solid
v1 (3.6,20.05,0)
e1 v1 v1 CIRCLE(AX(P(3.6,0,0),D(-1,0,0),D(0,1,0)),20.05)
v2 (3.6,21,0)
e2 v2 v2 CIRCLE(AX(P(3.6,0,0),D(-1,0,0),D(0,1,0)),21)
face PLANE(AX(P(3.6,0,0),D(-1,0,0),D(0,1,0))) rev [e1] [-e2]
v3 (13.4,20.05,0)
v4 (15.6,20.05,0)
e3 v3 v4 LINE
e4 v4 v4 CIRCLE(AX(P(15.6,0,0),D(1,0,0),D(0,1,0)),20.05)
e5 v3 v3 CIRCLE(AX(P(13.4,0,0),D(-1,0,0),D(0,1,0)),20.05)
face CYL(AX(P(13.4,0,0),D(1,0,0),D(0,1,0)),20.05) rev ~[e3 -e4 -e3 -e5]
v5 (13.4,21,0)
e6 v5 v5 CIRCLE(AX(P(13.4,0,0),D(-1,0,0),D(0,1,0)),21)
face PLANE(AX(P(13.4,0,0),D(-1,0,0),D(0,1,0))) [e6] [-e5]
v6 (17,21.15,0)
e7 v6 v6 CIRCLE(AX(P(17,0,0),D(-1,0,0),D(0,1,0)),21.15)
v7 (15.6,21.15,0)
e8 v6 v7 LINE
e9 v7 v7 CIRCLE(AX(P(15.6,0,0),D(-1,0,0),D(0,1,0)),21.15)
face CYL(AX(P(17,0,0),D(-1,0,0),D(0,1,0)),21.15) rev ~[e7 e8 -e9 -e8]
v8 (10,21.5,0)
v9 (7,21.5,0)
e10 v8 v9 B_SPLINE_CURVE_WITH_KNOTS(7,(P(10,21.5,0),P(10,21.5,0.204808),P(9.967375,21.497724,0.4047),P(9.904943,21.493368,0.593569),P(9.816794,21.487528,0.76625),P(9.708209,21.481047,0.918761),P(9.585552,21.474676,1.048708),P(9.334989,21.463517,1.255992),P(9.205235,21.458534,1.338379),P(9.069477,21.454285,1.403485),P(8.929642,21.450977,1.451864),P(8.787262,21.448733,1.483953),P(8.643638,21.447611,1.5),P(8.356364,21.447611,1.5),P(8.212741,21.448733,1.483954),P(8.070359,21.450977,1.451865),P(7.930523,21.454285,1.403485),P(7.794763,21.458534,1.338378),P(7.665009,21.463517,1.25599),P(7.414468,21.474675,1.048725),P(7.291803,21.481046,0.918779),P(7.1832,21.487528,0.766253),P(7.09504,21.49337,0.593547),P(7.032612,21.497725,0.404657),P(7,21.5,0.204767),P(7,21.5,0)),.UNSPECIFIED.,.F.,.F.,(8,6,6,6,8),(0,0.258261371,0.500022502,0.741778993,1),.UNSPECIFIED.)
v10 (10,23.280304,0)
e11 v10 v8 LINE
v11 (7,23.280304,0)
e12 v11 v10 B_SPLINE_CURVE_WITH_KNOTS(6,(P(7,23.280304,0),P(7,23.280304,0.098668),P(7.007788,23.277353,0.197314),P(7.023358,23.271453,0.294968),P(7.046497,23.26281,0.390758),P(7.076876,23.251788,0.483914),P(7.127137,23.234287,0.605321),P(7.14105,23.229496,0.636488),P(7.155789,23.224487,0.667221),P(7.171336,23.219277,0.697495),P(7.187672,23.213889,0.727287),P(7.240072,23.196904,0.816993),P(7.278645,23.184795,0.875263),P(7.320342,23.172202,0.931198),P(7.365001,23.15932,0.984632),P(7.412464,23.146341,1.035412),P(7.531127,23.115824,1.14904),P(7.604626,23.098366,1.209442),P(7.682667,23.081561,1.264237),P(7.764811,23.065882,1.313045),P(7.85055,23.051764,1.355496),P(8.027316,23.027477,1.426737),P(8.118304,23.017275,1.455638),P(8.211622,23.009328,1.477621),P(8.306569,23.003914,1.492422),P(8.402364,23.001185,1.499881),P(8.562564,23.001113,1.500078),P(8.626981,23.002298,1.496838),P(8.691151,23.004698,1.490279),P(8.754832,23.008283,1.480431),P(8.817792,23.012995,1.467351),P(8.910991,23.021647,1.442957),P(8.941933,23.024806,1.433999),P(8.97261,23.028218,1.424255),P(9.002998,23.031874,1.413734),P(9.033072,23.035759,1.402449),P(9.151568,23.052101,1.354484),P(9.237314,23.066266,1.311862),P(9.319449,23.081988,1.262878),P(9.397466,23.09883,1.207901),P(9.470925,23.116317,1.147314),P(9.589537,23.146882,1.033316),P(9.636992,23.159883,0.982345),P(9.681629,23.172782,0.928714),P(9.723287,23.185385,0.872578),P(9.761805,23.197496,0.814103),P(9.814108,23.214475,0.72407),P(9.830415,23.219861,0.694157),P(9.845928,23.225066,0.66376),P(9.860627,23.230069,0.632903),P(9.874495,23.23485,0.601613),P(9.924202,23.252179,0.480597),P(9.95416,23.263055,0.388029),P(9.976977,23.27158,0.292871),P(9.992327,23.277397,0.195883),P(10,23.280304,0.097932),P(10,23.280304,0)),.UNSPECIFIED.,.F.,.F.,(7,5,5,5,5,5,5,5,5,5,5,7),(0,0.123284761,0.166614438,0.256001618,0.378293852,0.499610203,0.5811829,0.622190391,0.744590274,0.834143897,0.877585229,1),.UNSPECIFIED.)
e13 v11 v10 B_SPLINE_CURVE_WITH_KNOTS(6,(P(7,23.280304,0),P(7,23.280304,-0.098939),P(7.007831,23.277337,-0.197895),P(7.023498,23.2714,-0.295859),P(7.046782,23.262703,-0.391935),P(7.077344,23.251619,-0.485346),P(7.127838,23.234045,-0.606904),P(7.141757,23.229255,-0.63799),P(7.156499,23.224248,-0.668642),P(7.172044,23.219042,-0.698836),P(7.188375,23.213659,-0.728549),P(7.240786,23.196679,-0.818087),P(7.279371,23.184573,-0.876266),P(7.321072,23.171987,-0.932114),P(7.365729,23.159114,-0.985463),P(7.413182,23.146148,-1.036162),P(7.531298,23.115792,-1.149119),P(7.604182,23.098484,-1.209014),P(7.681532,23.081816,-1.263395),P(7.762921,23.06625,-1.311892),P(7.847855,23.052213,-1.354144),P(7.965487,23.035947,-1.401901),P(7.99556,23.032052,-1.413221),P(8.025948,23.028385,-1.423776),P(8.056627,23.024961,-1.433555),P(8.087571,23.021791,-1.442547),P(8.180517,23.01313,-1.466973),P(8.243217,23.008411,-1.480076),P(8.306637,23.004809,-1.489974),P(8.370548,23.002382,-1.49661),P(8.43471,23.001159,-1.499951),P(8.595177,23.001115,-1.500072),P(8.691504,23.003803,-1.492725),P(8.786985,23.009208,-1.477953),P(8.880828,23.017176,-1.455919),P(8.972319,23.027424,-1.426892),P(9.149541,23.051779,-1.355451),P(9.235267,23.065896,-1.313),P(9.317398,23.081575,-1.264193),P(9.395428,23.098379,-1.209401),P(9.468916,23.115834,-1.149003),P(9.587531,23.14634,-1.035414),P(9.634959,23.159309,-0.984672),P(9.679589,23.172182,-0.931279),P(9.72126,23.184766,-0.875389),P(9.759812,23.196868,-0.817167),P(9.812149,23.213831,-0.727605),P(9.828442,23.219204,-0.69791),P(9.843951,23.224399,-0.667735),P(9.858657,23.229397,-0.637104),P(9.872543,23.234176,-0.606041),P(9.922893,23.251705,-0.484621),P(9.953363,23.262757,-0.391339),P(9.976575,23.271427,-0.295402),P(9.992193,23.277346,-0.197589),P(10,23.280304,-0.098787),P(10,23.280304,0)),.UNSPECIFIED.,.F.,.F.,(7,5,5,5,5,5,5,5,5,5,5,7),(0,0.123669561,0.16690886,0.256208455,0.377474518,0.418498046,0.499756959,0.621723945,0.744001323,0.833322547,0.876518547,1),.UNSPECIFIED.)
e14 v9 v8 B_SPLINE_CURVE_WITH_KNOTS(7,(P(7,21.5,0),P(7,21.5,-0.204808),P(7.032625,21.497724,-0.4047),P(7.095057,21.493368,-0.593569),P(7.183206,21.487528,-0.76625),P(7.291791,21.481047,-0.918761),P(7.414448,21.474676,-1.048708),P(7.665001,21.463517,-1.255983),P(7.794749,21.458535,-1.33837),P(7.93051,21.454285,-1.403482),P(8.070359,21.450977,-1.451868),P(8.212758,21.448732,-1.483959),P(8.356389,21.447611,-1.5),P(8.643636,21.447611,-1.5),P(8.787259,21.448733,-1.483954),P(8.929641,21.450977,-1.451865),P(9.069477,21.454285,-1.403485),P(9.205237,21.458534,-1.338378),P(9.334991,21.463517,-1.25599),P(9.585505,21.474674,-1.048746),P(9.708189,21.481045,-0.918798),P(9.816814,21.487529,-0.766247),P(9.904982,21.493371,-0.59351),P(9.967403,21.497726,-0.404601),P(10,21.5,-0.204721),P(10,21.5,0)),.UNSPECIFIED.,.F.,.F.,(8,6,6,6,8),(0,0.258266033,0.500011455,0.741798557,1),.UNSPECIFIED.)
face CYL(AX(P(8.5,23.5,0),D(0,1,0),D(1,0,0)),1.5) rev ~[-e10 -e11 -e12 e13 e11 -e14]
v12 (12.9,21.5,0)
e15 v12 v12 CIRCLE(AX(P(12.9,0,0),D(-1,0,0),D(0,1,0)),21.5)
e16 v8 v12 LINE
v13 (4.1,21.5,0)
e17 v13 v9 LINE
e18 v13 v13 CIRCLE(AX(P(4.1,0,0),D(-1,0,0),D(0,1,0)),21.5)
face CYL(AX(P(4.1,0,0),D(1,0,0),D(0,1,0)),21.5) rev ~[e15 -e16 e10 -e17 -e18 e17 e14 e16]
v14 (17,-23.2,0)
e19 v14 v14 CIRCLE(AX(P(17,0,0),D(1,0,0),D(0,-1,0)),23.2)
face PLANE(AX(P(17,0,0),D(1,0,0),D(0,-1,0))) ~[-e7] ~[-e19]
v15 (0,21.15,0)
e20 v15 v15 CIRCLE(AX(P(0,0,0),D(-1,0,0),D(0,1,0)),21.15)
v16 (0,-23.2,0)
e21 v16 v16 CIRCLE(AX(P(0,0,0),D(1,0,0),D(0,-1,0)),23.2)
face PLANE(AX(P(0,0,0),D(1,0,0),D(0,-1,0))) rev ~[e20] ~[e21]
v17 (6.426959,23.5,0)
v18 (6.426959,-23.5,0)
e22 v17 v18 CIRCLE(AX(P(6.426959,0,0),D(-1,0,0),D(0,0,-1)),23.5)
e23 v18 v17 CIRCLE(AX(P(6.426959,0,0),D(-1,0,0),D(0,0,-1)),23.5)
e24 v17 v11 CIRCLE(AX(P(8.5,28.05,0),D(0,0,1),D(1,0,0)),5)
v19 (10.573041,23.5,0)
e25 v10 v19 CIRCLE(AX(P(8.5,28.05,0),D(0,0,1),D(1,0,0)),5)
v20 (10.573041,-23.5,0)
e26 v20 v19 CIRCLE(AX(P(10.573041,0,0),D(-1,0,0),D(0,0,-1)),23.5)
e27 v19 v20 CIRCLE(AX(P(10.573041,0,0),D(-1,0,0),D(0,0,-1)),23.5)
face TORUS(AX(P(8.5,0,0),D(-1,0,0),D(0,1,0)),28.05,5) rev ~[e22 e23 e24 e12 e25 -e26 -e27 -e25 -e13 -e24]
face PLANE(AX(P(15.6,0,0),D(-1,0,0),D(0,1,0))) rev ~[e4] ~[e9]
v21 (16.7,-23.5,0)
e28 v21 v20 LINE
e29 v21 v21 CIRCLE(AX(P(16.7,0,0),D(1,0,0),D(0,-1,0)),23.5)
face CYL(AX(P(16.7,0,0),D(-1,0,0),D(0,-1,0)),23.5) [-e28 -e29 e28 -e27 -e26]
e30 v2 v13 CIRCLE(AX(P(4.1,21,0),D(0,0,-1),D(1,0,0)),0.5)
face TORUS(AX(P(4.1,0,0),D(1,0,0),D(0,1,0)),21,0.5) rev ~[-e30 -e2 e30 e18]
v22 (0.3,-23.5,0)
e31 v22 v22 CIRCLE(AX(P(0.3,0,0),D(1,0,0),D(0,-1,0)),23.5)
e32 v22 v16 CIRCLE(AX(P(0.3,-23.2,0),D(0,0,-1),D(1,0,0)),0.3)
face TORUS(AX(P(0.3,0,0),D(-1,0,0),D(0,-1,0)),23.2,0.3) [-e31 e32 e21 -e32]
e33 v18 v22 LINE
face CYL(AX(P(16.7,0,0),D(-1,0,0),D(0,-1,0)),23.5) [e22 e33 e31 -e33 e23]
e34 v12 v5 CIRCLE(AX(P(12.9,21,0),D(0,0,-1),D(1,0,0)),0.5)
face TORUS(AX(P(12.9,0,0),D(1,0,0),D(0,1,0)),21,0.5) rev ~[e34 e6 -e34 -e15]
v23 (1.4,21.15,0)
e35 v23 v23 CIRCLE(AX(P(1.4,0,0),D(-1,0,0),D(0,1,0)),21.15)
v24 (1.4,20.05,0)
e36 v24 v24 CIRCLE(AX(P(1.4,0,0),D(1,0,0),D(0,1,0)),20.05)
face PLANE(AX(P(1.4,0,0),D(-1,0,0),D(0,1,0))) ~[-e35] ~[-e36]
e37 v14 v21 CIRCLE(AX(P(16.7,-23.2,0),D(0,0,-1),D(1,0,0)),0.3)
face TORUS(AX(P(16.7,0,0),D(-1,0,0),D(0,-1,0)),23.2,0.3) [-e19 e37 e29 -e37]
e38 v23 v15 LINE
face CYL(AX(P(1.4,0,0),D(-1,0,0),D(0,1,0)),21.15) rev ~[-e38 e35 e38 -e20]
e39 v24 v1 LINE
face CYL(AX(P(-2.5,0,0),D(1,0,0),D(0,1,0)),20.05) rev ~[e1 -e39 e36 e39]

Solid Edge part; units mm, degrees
sketch "Sketch1" plane through (0, 0, 0) normal (0, 0, 1) x (1, 0, 0)
  line L0 (17, 0) -> (17, -23.2)
  arc A0 (17, -23.2) -> (16.7, -23.5) centre (16.7, -23.2) cw
  line L1 (16.7, -23.5) -> (0.3, -23.5)
  arc A1 (0.3, -23.5) -> (0, -23.2) centre (0.3, -23.2) cw
  line L2 (0, -23.2) -> (0, 0)
  line L3 (0, 0) -> (17, 0)
revolve "RevolvedProtrusion1" add sketch "Sketch1" angle 360 about axis through (0, 0, 0) along (1, 0, 0)
sketch "Sketch2" plane through (0, 0, 0) normal (0, 0, 1) x (1, 0, 0)
  line L0 (-2.5, 0) -> (-2.5, 20.05)
  line L1 (-2.5, 20.05) -> (3.6, 20.05)
  line L2 (3.6, 20.05) -> (3.6, 21)
  arc A0 (3.6, 21) -> (4.1, 21.5) centre (4.1, 21) cw
  line L3 (4.1, 21.5) -> (12.9, 21.5)
  arc A1 (12.9, 21.5) -> (13.4, 21) centre (12.9, 21) cw
  line L4 (13.4, 21) -> (13.4, 20.05)
  line L5 (13.4, 20.05) -> (19.5, 20.05)
  line L6 (19.5, 20.05) -> (19.5, 0)
  line L7 (19.5, 0) -> (-2.5, 0)
revolve "RevolvedCutout1" cut sketch "Sketch2" angle 360 about axis through (19.5, 0, 0) along (-1, 0, 0)
sketch "Sketch3" plane through (0, 0, 0) normal (0, 0, 1) x (1, 0, 0)
  circle A0 centre (8.5, 28.05) radius 5
revolve "RevolvedCutout2" cut sketch "Sketch3" angle 360 about axis through (13.5, 0, 0) along (-1, 0, 0)
sketch "Sketch4" plane through (0, 0, 0) normal (0, 0, 1) x (1, 0, 0)
  line L0 (15.6, 21.15) -> (15.6, 17.5)
  line L1 (15.6, 17.5) -> (17, 17.5)
  line L2 (17, 17.5) -> (17, 21.15)
  line L3 (17, 21.15) -> (15.6, 21.15)
revolve "RevolvedCutout3" cut sketch "Sketch4" angle 360 about axis through (55.5, 0, 0) along (-1, 0, 0)
sketch "Sketch5" plane through (0, 0, 0) normal (0, 0, 1) x (1, 0, 0)
  line L0 (0, 21.15) -> (0, 17.5)
  line L1 (0, 17.5) -> (1.4, 17.5)
  line L2 (1.4, 17.5) -> (1.4, 21.15)
  line L3 (1.4, 21.15) -> (0, 21.15)
revolve "RevolvedCutout4" cut sketch "Sketch5" angle 360 about axis through (55.5, 0, 0) along (-1, 0, 0)
sketch "Sketch6" plane through (0, 23.5, 0) normal (0, -1, 0) x (1, 0, 0)
  circle A0 centre (8.5, 0) radius 1.5
extrude "ExtrudedCutout_1" cut sketch "Sketch6" along normal blind 8
properties part number "NA 4906UU Outer ring" material "Aluminio, 7075-T6"
